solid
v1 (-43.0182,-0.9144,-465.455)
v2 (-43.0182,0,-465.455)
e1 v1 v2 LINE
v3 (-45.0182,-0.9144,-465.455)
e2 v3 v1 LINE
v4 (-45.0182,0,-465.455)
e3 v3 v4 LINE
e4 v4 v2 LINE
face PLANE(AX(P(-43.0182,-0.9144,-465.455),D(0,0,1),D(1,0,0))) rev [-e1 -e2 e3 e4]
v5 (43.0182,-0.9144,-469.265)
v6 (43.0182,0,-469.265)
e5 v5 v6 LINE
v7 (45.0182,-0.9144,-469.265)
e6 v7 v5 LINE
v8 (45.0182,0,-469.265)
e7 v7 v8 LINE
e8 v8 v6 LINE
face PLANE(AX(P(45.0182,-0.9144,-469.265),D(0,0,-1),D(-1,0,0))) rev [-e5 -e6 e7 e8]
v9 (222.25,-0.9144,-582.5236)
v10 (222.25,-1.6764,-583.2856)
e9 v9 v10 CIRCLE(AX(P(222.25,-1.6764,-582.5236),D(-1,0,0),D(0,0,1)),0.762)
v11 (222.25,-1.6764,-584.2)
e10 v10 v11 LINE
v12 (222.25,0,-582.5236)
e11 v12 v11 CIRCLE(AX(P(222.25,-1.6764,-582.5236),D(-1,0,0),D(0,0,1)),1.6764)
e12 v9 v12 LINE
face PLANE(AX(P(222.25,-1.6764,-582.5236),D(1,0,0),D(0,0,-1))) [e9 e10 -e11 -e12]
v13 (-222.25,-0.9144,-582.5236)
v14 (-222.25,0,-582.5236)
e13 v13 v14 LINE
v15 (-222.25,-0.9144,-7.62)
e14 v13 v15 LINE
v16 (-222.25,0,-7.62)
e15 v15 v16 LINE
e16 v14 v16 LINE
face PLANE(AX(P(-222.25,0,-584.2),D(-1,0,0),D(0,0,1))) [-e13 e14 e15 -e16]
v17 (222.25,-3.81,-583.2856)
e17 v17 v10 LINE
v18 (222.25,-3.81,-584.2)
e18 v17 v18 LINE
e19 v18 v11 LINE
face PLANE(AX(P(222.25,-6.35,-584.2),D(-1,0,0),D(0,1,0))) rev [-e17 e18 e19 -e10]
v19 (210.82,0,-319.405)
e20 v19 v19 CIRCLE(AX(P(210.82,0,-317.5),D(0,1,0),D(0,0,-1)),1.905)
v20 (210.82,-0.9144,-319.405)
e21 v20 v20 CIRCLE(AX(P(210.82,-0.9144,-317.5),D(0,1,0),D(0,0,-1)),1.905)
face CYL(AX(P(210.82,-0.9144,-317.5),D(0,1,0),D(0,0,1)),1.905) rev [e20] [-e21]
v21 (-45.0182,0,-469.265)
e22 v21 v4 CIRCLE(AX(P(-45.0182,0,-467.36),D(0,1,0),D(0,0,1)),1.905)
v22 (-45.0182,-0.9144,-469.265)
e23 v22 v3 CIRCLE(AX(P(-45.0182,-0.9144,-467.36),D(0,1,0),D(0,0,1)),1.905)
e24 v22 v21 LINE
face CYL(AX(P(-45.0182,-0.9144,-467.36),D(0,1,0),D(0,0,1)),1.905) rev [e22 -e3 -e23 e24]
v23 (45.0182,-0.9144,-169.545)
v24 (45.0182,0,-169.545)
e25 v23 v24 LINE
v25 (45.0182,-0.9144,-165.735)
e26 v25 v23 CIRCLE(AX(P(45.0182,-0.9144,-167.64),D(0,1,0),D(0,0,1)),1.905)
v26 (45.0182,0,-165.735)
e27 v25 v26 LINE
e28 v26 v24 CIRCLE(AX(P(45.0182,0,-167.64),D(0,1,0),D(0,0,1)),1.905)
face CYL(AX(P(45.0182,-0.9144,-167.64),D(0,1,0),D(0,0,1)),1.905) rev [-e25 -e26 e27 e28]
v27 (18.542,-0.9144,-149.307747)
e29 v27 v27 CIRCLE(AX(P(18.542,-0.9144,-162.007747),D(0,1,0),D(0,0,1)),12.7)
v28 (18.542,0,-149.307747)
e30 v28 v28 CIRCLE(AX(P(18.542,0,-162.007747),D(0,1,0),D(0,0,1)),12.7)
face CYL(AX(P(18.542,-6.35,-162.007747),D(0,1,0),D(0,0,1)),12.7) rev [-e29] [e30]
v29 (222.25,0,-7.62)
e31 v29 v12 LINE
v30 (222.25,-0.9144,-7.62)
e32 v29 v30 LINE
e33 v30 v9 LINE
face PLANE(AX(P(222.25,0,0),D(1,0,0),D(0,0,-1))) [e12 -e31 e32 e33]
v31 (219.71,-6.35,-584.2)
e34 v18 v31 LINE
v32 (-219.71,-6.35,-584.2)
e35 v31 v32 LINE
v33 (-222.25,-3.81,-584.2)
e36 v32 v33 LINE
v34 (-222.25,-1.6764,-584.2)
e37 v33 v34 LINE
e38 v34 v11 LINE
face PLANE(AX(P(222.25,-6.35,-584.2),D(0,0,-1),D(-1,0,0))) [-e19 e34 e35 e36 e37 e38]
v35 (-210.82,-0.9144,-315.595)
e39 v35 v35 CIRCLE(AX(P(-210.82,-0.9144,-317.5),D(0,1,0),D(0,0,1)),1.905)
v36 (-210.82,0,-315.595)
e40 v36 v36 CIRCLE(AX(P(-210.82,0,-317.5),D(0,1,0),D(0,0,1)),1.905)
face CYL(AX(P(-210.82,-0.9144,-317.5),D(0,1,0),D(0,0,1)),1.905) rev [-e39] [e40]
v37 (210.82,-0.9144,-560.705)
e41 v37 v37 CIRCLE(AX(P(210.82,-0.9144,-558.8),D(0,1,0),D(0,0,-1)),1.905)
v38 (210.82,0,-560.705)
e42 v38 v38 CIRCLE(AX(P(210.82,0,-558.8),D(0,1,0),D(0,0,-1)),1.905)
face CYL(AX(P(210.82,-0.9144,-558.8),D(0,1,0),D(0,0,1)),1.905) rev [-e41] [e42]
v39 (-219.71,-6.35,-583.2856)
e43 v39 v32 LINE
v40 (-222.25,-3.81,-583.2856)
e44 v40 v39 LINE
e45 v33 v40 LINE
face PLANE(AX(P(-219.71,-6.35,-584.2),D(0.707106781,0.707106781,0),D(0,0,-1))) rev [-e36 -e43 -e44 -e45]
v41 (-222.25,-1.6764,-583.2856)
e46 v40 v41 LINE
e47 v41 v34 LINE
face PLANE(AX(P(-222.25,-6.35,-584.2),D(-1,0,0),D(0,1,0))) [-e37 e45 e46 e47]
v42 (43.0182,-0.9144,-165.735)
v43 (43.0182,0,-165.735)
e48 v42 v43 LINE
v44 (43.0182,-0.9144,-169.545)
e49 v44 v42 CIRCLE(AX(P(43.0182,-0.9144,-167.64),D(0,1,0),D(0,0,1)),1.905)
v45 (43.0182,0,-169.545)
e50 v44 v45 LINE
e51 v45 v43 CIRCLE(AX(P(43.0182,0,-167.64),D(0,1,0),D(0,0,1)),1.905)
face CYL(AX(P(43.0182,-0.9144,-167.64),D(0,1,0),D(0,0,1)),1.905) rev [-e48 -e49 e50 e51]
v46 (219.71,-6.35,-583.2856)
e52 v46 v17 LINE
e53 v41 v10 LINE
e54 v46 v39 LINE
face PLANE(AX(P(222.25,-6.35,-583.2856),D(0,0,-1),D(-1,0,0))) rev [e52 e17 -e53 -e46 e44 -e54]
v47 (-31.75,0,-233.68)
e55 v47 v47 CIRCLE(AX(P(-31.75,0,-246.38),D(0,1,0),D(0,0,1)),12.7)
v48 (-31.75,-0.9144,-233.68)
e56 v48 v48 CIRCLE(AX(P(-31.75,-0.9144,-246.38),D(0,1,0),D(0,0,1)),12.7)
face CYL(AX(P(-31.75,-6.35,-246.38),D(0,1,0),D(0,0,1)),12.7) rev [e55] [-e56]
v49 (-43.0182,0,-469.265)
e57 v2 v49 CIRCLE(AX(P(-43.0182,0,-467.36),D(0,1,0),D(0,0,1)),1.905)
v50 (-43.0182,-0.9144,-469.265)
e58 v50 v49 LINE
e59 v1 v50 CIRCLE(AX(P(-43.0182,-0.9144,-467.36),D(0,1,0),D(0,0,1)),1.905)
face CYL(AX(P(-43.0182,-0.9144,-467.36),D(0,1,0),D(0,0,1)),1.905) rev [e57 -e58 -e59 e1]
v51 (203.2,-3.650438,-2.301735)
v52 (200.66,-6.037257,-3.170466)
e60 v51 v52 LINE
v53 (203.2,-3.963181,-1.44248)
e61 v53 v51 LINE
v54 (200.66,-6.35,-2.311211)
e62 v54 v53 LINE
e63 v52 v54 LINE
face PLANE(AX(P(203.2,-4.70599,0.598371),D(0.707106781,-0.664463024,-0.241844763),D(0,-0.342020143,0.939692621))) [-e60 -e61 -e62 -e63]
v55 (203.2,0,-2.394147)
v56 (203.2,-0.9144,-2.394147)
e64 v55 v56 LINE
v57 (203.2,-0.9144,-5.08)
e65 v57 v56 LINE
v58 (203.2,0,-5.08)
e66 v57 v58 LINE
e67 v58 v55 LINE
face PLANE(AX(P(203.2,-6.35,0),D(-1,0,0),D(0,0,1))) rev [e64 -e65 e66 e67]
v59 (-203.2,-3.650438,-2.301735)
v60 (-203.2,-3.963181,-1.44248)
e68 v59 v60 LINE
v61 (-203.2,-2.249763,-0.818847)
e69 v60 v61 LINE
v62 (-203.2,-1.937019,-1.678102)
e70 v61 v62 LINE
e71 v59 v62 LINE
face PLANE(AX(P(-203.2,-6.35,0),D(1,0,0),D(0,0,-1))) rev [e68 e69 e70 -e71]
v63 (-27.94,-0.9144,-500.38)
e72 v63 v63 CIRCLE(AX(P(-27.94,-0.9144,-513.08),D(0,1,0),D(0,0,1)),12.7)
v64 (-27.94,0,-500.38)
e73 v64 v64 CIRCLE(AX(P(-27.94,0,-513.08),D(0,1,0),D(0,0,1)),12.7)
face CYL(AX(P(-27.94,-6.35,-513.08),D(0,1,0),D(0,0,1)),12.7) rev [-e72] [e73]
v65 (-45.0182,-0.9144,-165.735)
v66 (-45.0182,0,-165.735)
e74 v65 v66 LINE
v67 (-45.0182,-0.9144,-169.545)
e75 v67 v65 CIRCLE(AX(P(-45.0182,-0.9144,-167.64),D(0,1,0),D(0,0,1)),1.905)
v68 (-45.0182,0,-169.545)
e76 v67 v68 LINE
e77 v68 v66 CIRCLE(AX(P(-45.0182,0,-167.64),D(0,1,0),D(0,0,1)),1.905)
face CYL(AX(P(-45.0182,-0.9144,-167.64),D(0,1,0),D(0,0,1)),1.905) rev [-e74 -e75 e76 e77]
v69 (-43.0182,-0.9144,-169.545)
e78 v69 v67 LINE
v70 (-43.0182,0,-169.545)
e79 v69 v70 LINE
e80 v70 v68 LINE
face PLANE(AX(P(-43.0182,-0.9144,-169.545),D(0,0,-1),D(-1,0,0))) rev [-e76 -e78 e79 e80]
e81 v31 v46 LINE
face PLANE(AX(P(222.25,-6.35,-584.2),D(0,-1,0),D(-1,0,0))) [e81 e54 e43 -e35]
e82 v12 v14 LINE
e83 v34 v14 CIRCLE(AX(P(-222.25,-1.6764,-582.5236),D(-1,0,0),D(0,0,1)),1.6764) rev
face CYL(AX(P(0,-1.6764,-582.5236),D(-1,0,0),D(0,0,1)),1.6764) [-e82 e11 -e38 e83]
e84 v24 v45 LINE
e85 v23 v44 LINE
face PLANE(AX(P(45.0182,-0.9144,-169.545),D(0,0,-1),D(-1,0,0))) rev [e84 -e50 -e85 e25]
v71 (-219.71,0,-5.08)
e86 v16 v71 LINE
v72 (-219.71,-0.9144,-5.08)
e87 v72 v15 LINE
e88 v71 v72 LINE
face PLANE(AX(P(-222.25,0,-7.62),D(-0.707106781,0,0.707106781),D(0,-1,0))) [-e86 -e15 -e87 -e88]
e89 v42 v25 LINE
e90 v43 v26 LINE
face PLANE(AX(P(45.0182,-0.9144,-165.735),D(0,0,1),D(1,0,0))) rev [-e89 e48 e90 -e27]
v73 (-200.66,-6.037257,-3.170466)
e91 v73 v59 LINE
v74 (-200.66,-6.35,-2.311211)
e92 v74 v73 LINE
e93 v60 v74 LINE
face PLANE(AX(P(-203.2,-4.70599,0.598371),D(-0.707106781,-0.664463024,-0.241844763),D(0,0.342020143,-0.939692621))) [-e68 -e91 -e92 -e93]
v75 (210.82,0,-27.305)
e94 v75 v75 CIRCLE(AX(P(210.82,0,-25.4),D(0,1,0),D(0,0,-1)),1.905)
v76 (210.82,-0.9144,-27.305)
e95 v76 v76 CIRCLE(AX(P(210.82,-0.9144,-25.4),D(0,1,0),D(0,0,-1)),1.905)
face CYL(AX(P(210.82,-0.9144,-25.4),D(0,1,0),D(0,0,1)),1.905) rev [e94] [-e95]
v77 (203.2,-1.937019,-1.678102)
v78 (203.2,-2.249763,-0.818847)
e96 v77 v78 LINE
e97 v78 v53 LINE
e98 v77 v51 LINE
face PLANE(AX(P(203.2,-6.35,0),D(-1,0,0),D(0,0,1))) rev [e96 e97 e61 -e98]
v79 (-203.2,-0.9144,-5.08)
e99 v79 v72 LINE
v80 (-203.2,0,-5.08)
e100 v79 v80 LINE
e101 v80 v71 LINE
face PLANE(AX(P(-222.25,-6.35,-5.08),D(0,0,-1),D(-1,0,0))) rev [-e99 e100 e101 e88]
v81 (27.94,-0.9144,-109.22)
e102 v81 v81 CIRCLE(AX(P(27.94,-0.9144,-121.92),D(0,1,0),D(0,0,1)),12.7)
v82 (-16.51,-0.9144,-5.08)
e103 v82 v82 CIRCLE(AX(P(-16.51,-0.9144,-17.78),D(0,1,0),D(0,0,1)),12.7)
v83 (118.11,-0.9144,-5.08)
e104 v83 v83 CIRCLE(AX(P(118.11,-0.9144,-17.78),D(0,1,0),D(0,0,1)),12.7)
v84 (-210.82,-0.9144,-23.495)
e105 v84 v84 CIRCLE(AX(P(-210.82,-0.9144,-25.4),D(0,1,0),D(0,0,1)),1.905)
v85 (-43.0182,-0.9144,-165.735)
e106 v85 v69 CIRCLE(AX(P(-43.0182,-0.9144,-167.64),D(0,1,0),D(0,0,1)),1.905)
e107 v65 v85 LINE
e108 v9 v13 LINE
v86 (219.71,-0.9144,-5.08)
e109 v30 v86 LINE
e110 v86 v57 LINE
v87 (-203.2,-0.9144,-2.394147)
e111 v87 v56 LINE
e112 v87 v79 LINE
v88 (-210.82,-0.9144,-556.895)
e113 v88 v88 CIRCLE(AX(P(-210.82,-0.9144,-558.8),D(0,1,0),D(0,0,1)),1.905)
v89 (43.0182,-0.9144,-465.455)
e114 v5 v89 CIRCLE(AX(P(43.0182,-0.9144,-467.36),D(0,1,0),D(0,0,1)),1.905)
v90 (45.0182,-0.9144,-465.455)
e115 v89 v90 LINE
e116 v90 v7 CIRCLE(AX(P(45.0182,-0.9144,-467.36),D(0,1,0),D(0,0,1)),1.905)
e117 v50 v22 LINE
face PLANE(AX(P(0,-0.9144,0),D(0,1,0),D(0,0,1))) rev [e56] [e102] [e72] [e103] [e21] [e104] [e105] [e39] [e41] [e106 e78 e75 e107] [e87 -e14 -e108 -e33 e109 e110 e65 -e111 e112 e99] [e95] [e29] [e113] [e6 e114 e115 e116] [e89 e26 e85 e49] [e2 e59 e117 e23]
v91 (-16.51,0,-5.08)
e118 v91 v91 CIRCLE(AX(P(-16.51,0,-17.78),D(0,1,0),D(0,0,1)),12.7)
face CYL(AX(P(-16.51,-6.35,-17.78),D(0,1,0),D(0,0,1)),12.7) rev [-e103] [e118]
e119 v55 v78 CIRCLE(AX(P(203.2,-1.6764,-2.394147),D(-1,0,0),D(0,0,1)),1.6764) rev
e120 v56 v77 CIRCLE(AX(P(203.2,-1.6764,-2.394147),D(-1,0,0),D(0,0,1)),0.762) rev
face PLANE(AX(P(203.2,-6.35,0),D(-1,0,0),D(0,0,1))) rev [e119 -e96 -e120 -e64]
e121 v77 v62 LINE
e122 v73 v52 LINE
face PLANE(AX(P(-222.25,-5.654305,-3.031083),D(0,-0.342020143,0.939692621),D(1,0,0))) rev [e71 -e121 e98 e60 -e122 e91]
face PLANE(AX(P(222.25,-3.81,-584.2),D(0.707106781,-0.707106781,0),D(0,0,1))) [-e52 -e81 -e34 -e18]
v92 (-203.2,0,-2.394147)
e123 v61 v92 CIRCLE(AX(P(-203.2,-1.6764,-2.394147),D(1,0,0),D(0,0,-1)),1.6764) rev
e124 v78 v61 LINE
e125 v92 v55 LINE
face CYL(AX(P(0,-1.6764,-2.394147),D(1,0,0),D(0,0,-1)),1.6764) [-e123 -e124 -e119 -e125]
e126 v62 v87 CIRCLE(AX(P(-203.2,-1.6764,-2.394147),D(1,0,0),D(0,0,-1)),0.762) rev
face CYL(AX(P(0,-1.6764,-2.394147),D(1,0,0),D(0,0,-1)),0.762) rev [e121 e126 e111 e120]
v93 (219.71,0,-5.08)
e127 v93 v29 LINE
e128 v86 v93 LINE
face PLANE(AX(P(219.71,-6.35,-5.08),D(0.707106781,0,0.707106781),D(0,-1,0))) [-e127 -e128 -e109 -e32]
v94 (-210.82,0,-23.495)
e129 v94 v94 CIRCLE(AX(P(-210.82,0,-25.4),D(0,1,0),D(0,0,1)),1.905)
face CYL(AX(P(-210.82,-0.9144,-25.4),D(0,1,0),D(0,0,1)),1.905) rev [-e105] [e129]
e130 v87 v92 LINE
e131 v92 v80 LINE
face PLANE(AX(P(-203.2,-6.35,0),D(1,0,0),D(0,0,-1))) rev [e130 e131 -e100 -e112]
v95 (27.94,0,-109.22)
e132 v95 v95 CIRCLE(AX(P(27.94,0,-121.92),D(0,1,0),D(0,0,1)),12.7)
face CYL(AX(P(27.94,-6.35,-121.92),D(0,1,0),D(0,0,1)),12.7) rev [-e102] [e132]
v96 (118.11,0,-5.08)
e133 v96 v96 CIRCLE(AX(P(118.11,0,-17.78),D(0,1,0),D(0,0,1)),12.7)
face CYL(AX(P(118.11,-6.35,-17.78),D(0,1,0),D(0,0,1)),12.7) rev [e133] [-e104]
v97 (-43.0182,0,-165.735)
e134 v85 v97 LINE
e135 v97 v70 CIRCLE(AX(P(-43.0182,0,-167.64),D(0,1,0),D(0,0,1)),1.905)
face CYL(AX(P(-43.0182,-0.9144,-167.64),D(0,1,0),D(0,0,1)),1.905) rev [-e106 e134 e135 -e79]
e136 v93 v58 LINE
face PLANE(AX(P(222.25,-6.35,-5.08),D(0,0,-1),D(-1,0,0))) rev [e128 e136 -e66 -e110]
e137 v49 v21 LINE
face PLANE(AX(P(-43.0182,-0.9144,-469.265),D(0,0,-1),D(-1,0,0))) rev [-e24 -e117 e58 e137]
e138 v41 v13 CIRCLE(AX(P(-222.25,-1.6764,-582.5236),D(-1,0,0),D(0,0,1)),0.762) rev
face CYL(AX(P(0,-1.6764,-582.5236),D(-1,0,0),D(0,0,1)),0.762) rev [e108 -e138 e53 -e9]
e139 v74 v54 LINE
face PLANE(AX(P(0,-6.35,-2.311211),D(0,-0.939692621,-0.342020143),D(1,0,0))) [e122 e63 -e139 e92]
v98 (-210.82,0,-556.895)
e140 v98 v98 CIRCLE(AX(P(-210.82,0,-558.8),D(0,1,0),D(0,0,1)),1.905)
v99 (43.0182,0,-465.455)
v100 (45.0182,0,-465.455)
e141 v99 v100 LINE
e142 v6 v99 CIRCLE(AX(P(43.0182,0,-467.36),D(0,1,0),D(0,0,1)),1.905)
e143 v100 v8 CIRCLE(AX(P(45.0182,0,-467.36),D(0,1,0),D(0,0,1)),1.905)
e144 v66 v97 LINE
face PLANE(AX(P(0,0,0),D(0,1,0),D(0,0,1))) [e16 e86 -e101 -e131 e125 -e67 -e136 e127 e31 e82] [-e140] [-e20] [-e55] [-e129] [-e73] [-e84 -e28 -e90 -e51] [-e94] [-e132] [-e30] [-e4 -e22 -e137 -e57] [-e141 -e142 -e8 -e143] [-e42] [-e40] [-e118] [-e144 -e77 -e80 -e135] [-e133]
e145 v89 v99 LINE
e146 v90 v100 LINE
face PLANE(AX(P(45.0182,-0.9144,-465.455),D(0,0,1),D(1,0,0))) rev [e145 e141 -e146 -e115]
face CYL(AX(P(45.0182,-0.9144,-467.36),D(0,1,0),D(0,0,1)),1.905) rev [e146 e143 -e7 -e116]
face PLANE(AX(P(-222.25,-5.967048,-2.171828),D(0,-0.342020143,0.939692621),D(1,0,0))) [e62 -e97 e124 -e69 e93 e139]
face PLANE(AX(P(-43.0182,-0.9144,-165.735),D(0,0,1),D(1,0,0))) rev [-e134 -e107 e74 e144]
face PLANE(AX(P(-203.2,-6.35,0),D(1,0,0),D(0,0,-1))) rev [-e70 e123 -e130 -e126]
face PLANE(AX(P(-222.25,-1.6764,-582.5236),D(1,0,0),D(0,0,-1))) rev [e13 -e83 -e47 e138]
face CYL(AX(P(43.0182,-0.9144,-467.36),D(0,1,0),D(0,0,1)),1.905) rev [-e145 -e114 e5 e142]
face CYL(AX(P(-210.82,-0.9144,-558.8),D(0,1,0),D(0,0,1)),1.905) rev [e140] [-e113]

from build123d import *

# Parameters (mm, degrees)
SKETCH2_W               = 444.5
SKETCH2_H               = 584.2
BOSS_EXTRUDE1_DEPTH     = 6.35
MOVE_START              = -2.17182791
MOVE_FACE1_OUTLINE_W    = 448
MOVE_FACE1_OUTLINE_H    = 9
MOVE_FACE1_DEPTH        = 2.17182791
CONVERT_SOLID1_START    = -222.25
CONVERT_SOLID1_DEPTH    = 444.5
SKETCH7_W               = 19.05
SKETCH7_H               = 5.08
CUT_EXTRUDE1_DEPTH      = 626.080014878
SKETCH9_R               = 1.905
CUT_EXTRUDE2_DEPTH      = 1.2192
CHAMFER1_SIZE           = 2.54
CUT_EXTRUDE3_DEPTH      = 626.080014878
CUT_EXTRUDE3_DEPTH_BACK = 626.080014878
SKETCH10_R              = 12.7


# Read off the part's stored shape, not the designer's step: Move Face1, Convert-Solid1
with BuildPart() as part:
    # Sketch2 → Boss-Extrude1 (new body)
    with BuildSketch(Plane(origin=(0, 0, 0), x_dir=(1, 0, 0), z_dir=(0, 1, 0))):
        with Locations((0, 292.1)):
            Rectangle(SKETCH2_W, SKETCH2_H)
    extrude(amount=-BOSS_EXTRUDE1_DEPTH)

    # Move Face1 outline → Move Face1 (cut)
    with BuildSketch(Plane(origin=(0, 0, 0), x_dir=(1, 0, 0), z_dir=(0, 0.3420201433256691, -0.9396926207859083)).offset(MOVE_START)):
        with Locations((0, 3.5)):
            Rectangle(MOVE_FACE1_OUTLINE_W, MOVE_FACE1_OUTLINE_H)
    extrude(amount=MOVE_FACE1_DEPTH, mode=Mode.SUBTRACT)

    # Convert-Solid1 outline → Convert-Solid1 (cut)
    with BuildSketch(Plane.YZ.offset(CONVERT_SOLID1_START)):
        with BuildLine():
            Line((-6.037256781, -3.17046592), (-6.35, -2.311210988))
            Line((-6.35, -2.311210988), (-6.35, -583.2856))
            Line((-6.35, -583.2856), (-1.6764, -583.2856))
            ThreePointArc((-1.6764, -583.2856), (-1.137584633, -583.062415367), (-0.9144, -582.5236))
            Line((-0.9144, -582.5236), (-0.9144, -2.394147319))
            ThreePointArc((-0.9144, -2.394147319), (-1.239334756, -1.769953461), (-1.937019349, -1.678101541))
            Line((-1.937019349, -1.678101541), (-6.037256781, -3.17046592))
        make_face()
        with BuildLine():
            Line((0, 0), (-2.249762568, -0.818846609))
            ThreePointArc((-2.249762568, -0.818846609), (-0.714856462, -1.020920831), (0, -2.394147319))
            Line((0, -2.394147319), (0, 0))
        make_face()
        with BuildLine():
            Line((0, -584.2), (0, -582.5236))
            ThreePointArc((0, -582.5236), (-0.491006192, -583.708993808), (-1.6764, -584.2))
            Line((-1.6764, -584.2), (0, -584.2))
        make_face()
    extrude(amount=CONVERT_SOLID1_DEPTH, mode=Mode.SUBTRACT)

    # Sketch7 → Cut-Extrude1 (cut, through all)
    with BuildSketch(Plane(origin=(0, 0, 0), x_dir=(1, 0, 0), z_dir=(0, 1, 0))):
        with Locations((-212.725, 2.54)):
            Rectangle(SKETCH7_W, SKETCH7_H)
        with Locations((212.725, 2.54)):
            Rectangle(SKETCH7_W, SKETCH7_H)
    extrude(amount=-CUT_EXTRUDE1_DEPTH, mode=Mode.SUBTRACT)

    # Sketch9 → Cut-Extrude2 (cut)
    with BuildSketch(Plane(origin=(0, 0, 0), x_dir=(1, 0, 0), z_dir=(0, 1, 0))):
        with Locations(Location((-210.82, 25.4, 0), (0, 0, 270))):
            Circle(SKETCH9_R)
        with Locations(Location((-210.82, 317.5, 0), (0, 0, 270))):
            Circle(SKETCH9_R)
        with Locations(Location((-210.82, 558.8, 0), (0, 0, 270))):
            Circle(SKETCH9_R)
        with Locations(Location((210.82, 558.8, 0), (0, 0, 90))):
            Circle(SKETCH9_R)
        with Locations(Location((210.82, 317.5, 0), (0, 0, 90))):
            Circle(SKETCH9_R)
        with Locations(Location((210.82, 25.4, 0), (0, 0, 90))):
            Circle(SKETCH9_R)
        with BuildLine():
            Line((-43.0182, 465.455), (-45.0182, 465.455))
            ThreePointArc((-45.0182, 465.455), (-46.9232, 467.36), (-45.0182, 469.265))
            Line((-45.0182, 469.265), (-43.0182, 469.265))
            ThreePointArc((-43.0182, 469.265), (-41.1132, 467.36), (-43.0182, 465.455))
        make_face()
        with BuildLine():
            Line((45.0182, 465.455), (43.0182, 465.455))
            ThreePointArc((43.0182, 465.455), (41.1132, 467.36), (43.0182, 469.265))
            Line((43.0182, 469.265), (45.0182, 469.265))
            ThreePointArc((45.0182, 469.265), (46.9232, 467.36), (45.0182, 465.455))
        make_face()
        with BuildLine():
            Line((-43.0182, 165.735), (-45.0182, 165.735))
            ThreePointArc((-45.0182, 165.735), (-46.9232, 167.64), (-45.0182, 169.545))
            Line((-45.0182, 169.545), (-43.0182, 169.545))
            ThreePointArc((-43.0182, 169.545), (-41.1132, 167.64), (-43.0182, 165.735))
        make_face()
        with BuildLine():
            Line((45.0182, 165.735), (43.0182, 165.735))
            ThreePointArc((43.0182, 165.735), (41.1132, 167.64), (43.0182, 169.545))
            Line((43.0182, 169.545), (45.0182, 169.545))
            ThreePointArc((45.0182, 169.545), (46.9232, 167.64), (45.0182, 165.735))
        make_face()
    extrude(amount=-CUT_EXTRUDE2_DEPTH, mode=Mode.SUBTRACT)

    # Chamfer1
    chamfer1_edges = [part.edges().sort_by_distance(p)[0] for p in [
        (-222.25, -6.35, -583.7428),
        (222.25, -6.35, -583.7428),
        (-222.25, -0.4572, -5.08),
        (-203.2, -6.193628391, -2.740838454),
        (222.25, -0.4572, -5.08),
        (203.2, -6.193628391, -2.740838454),
    ]]
    chamfer(chamfer1_edges, length=CHAMFER1_SIZE)

    # Sketch10 → Cut-Extrude3 (cut, two sides: drawn at the far end of the back side and taken through both)
    with BuildSketch(Plane(origin=(0, 0, 0), x_dir=(1, 0, 0), z_dir=(0, 1, 0)).offset(-CUT_EXTRUDE3_DEPTH_BACK)):
        with Locations(Location((18.542, 162.007747319, 0), (0, 0, 270))):
            Circle(SKETCH10_R)
        with Locations(Location((-16.51, 17.78, 0), (0, 0, 270))):
            Circle(SKETCH10_R)
        with Locations(Location((-31.75, 246.38, 0), (0, 0, 270))):
            Circle(SKETCH10_R)
        with Locations(Location((118.11, 17.78, 0), (0, 0, 270))):
            Circle(SKETCH10_R)
        with Locations(Location((-27.94, 513.08, 0), (0, 0, 270))):
            Circle(SKETCH10_R)
        with Locations(Location((27.94, 121.92, 0), (0, 0, 270))):
            Circle(SKETCH10_R)
    extrude(amount=CUT_EXTRUDE3_DEPTH + CUT_EXTRUDE3_DEPTH_BACK, mode=Mode.SUBTRACT)


solid = part.part
